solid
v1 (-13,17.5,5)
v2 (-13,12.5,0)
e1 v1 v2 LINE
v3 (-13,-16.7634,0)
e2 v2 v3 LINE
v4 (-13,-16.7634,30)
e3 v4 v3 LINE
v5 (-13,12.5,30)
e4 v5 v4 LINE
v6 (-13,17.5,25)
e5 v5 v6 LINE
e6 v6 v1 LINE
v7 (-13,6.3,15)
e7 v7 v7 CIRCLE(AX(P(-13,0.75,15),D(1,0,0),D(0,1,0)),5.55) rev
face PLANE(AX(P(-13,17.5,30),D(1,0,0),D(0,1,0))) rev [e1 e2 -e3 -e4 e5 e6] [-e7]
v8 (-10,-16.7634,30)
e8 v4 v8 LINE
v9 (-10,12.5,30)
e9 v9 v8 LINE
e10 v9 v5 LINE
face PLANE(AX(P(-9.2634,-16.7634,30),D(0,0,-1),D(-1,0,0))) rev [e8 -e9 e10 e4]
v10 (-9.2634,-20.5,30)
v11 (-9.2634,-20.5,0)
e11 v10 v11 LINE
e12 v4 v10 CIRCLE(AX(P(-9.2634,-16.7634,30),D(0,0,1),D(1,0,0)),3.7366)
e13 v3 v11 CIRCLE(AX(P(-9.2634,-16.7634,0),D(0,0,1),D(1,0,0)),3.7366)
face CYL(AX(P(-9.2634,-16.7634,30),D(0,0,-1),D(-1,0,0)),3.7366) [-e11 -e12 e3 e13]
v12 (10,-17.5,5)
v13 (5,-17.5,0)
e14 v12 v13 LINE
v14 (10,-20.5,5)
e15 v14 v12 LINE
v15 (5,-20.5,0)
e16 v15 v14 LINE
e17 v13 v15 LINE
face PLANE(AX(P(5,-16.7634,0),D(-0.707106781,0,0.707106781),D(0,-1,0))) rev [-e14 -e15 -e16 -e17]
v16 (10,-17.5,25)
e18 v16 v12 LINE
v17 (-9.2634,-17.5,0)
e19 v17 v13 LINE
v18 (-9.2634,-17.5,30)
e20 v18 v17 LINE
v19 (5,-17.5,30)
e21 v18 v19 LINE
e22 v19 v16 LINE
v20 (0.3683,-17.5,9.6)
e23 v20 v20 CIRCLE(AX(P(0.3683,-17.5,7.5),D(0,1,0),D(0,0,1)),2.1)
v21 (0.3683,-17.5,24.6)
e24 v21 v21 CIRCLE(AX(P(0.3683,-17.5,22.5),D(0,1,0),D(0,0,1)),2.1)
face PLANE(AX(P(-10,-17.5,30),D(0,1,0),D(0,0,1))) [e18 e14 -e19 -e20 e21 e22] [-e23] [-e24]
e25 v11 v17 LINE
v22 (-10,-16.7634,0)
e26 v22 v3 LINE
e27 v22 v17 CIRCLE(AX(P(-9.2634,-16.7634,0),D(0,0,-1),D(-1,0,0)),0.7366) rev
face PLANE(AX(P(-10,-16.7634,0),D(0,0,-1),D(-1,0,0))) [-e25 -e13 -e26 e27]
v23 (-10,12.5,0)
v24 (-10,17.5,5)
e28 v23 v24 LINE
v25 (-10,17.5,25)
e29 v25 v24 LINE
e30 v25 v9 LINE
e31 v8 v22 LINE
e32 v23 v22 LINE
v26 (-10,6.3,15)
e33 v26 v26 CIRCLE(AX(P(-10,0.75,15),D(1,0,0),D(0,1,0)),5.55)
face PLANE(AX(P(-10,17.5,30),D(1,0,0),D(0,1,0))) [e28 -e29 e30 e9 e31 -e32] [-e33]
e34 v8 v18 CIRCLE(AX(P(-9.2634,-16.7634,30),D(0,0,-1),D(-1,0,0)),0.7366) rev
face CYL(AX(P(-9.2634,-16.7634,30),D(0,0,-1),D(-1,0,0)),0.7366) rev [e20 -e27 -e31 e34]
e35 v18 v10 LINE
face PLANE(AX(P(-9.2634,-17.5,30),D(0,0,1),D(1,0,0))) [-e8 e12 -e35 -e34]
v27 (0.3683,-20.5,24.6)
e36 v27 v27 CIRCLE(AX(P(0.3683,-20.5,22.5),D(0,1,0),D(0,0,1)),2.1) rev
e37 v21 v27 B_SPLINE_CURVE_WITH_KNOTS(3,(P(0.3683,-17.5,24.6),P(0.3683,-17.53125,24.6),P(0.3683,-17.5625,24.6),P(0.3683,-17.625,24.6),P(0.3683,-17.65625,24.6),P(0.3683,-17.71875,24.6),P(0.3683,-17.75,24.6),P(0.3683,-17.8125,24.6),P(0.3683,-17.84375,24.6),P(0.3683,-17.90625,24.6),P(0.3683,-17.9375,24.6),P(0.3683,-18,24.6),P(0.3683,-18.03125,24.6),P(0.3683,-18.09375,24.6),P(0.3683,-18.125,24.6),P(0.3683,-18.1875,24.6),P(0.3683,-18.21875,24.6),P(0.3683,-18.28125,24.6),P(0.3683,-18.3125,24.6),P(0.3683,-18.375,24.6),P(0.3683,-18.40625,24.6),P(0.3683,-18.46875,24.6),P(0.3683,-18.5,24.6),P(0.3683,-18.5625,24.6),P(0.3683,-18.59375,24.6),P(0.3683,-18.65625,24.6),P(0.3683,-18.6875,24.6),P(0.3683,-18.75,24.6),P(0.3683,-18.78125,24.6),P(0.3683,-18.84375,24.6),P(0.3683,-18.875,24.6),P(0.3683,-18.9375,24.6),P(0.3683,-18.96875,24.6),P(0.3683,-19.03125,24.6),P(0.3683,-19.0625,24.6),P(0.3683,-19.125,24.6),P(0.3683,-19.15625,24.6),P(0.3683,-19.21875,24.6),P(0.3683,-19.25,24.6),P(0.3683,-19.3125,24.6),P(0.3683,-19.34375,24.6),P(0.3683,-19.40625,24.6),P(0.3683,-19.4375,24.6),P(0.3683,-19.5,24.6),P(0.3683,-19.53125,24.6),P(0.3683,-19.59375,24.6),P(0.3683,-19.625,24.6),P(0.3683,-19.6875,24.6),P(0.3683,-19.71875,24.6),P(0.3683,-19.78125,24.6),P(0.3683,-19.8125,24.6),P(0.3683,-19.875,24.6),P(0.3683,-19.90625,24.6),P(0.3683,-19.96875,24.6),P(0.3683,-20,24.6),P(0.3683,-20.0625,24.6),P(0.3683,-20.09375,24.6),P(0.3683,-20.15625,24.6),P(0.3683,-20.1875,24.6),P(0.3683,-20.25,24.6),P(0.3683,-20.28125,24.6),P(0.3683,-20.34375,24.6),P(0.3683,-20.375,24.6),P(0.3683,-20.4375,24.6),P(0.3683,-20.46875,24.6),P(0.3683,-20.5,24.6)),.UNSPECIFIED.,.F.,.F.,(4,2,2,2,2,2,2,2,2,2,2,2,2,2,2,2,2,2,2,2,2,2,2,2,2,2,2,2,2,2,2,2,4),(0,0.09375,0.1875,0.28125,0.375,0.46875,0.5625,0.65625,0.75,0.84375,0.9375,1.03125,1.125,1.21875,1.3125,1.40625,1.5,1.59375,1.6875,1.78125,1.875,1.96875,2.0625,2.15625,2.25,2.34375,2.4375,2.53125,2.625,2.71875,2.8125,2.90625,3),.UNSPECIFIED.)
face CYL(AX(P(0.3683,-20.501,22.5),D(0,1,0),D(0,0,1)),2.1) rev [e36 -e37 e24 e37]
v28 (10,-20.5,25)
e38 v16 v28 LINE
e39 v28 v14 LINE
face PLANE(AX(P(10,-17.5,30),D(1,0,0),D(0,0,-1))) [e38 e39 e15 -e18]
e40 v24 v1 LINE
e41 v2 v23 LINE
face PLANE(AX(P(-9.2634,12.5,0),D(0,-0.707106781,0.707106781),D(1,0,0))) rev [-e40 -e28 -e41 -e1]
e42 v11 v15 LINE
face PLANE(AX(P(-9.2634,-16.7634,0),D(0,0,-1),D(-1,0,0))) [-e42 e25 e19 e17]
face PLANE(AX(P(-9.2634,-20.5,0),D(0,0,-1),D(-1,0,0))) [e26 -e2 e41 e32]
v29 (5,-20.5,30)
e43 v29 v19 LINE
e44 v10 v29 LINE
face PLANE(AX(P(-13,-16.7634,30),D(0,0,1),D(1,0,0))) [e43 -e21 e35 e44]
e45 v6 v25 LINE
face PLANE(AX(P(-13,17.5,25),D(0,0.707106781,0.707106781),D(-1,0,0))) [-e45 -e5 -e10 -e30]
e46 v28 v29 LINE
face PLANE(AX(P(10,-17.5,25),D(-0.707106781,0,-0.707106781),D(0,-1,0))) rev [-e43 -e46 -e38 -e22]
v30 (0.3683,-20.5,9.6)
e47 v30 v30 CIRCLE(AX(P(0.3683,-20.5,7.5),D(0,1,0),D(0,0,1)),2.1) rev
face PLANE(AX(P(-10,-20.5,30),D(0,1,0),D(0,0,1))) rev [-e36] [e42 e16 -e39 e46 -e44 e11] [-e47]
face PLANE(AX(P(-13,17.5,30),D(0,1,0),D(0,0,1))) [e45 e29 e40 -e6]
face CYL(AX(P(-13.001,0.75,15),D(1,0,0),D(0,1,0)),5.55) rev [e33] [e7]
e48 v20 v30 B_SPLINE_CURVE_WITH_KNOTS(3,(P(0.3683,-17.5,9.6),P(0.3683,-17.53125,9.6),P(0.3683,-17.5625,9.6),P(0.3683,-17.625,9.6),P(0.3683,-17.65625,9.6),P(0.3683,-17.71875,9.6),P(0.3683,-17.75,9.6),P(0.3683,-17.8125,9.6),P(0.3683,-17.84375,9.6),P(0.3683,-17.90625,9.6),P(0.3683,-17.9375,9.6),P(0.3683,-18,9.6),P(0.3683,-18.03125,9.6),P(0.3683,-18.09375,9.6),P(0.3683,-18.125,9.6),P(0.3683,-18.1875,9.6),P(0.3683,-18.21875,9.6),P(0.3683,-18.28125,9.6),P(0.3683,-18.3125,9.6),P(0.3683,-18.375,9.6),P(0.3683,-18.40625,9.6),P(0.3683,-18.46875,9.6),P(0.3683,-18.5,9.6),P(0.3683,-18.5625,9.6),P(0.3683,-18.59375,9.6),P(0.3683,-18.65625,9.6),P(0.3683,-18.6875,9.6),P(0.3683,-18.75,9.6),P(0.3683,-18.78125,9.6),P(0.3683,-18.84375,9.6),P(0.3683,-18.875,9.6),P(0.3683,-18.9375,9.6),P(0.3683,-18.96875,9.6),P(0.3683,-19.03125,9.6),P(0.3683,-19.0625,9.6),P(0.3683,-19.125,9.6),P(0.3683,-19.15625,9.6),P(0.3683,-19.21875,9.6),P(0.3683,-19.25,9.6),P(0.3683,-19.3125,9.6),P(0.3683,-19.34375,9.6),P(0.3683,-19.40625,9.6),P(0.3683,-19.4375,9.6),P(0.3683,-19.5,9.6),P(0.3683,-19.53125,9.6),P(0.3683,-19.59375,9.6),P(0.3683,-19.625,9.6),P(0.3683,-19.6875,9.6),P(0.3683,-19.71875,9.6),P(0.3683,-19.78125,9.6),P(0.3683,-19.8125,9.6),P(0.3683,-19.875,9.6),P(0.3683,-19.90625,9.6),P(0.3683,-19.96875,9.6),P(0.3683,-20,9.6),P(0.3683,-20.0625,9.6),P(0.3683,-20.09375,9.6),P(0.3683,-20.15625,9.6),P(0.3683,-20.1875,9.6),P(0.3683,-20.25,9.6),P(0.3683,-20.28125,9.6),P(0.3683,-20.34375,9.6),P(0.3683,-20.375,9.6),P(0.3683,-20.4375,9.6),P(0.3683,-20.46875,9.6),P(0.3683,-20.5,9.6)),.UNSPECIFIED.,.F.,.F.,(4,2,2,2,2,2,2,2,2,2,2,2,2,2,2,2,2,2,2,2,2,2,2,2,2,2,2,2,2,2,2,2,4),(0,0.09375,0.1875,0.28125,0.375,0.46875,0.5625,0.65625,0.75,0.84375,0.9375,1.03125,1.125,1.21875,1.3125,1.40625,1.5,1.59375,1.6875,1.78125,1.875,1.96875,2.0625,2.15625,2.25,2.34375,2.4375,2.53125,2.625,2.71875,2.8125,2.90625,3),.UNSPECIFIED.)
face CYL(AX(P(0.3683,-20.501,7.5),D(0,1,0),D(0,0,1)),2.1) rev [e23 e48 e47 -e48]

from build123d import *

# Parameters (mm, degrees)
SM_BASE_FLANGE_1_DEPTH = 30
CUT_EXTRUDE_1_REACH    = 43.476
SKETCH_6_R             = 5.55
CUT_EXTRUDE_2_REACH    = 49.896
SKETCH_7_R             = 2.1
CHAMFER_1_SIZE         = 5


# Sheet-metal steps are written as plain solids
with BuildPart() as part:
    # Sketch 1 → 基材-凸緣1 (new body)
    with BuildSketch(Plane.XY):
        with BuildLine():
            Line((-10, 17.5), (-10, -16.7634))
            ThreePointArc((-10, -16.7634), (-9.784254855, -17.284254855), (-9.2634, -17.5))
            Line((-9.2634, -17.5), (10, -17.5))
            Line((10, -17.5), (10, -20.5))
            Line((10, -20.5), (-9.2634, -20.5))
            ThreePointArc((-9.2634, -20.5), (-11.905575199, -19.405575199), (-13, -16.7634))
            Line((-13, -16.7634), (-13, 17.5))
            Line((-13, 17.5), (-10, 17.5))
        make_face()
    extrude(amount=SM_BASE_FLANGE_1_DEPTH)

    # 草圖6 → 除料-伸長1 (cut, up to next)
    with BuildSketch(Plane(origin=(-10, 0, 0), x_dir=(0, 0, -1), z_dir=(1, 0, 0)), mode=Mode.PRIVATE) as cut_extrude_1_sk1:
        with Locations(Location((-15, 0.75, 0), (0, 0, 90))):
            Circle(SKETCH_6_R)
    cut_extrude_1_tool1 = extrude(cut_extrude_1_sk1.sketch, amount=-CUT_EXTRUDE_1_REACH, mode=Mode.PRIVATE) & part.part
    add(cut_extrude_1_tool1.solids().sort_by_distance((-10, 0.75, 15))[0], mode=Mode.SUBTRACT)

    # 草圖7 → 除料-伸長2 (cut, up to next)
    with BuildSketch(Plane(origin=(0, -17.5, 0), x_dir=(1, 0, 0), z_dir=(0, 1, 0)), mode=Mode.PRIVATE) as cut_extrude_2_sk1:
        with Locations(Location((0.3683, -22.5, 0), (0, 0, 270))):
            Circle(SKETCH_7_R)
    cut_extrude_2_tool1 = extrude(cut_extrude_2_sk1.sketch, amount=-CUT_EXTRUDE_2_REACH, mode=Mode.PRIVATE) & part.part
    # 草圖7 → 除料-伸長2 (cut, up to next)
    with BuildSketch(Plane(origin=(0, -17.5, 0), x_dir=(1, 0, 0), z_dir=(0, 1, 0)), mode=Mode.PRIVATE) as cut_extrude_2_sk2:
        with Locations(Location((0.3683, -7.5, 0), (0, 0, 270))):
            Circle(SKETCH_7_R)
    cut_extrude_2_tool2 = extrude(cut_extrude_2_sk2.sketch, amount=-CUT_EXTRUDE_2_REACH, mode=Mode.PRIVATE) & part.part
    add(cut_extrude_2_tool1.solids().sort_by_distance((0.3683, -17.5, 22.5))[0], mode=Mode.SUBTRACT)
    add(cut_extrude_2_tool2.solids().sort_by_distance((0.3683, -17.5, 7.5))[0], mode=Mode.SUBTRACT)

    # 導角1
    chamfer_1_edges = [part.edges().sort_by_distance(p)[0] for p in [
        (-11.5, 17.5, 30),
        (-11.5, 17.5, 0),
        (10, -19, 30),
        (10, -19, 0),
    ]]
    chamfer(chamfer_1_edges, length=CHAMFER_1_SIZE)


solid = part.part
